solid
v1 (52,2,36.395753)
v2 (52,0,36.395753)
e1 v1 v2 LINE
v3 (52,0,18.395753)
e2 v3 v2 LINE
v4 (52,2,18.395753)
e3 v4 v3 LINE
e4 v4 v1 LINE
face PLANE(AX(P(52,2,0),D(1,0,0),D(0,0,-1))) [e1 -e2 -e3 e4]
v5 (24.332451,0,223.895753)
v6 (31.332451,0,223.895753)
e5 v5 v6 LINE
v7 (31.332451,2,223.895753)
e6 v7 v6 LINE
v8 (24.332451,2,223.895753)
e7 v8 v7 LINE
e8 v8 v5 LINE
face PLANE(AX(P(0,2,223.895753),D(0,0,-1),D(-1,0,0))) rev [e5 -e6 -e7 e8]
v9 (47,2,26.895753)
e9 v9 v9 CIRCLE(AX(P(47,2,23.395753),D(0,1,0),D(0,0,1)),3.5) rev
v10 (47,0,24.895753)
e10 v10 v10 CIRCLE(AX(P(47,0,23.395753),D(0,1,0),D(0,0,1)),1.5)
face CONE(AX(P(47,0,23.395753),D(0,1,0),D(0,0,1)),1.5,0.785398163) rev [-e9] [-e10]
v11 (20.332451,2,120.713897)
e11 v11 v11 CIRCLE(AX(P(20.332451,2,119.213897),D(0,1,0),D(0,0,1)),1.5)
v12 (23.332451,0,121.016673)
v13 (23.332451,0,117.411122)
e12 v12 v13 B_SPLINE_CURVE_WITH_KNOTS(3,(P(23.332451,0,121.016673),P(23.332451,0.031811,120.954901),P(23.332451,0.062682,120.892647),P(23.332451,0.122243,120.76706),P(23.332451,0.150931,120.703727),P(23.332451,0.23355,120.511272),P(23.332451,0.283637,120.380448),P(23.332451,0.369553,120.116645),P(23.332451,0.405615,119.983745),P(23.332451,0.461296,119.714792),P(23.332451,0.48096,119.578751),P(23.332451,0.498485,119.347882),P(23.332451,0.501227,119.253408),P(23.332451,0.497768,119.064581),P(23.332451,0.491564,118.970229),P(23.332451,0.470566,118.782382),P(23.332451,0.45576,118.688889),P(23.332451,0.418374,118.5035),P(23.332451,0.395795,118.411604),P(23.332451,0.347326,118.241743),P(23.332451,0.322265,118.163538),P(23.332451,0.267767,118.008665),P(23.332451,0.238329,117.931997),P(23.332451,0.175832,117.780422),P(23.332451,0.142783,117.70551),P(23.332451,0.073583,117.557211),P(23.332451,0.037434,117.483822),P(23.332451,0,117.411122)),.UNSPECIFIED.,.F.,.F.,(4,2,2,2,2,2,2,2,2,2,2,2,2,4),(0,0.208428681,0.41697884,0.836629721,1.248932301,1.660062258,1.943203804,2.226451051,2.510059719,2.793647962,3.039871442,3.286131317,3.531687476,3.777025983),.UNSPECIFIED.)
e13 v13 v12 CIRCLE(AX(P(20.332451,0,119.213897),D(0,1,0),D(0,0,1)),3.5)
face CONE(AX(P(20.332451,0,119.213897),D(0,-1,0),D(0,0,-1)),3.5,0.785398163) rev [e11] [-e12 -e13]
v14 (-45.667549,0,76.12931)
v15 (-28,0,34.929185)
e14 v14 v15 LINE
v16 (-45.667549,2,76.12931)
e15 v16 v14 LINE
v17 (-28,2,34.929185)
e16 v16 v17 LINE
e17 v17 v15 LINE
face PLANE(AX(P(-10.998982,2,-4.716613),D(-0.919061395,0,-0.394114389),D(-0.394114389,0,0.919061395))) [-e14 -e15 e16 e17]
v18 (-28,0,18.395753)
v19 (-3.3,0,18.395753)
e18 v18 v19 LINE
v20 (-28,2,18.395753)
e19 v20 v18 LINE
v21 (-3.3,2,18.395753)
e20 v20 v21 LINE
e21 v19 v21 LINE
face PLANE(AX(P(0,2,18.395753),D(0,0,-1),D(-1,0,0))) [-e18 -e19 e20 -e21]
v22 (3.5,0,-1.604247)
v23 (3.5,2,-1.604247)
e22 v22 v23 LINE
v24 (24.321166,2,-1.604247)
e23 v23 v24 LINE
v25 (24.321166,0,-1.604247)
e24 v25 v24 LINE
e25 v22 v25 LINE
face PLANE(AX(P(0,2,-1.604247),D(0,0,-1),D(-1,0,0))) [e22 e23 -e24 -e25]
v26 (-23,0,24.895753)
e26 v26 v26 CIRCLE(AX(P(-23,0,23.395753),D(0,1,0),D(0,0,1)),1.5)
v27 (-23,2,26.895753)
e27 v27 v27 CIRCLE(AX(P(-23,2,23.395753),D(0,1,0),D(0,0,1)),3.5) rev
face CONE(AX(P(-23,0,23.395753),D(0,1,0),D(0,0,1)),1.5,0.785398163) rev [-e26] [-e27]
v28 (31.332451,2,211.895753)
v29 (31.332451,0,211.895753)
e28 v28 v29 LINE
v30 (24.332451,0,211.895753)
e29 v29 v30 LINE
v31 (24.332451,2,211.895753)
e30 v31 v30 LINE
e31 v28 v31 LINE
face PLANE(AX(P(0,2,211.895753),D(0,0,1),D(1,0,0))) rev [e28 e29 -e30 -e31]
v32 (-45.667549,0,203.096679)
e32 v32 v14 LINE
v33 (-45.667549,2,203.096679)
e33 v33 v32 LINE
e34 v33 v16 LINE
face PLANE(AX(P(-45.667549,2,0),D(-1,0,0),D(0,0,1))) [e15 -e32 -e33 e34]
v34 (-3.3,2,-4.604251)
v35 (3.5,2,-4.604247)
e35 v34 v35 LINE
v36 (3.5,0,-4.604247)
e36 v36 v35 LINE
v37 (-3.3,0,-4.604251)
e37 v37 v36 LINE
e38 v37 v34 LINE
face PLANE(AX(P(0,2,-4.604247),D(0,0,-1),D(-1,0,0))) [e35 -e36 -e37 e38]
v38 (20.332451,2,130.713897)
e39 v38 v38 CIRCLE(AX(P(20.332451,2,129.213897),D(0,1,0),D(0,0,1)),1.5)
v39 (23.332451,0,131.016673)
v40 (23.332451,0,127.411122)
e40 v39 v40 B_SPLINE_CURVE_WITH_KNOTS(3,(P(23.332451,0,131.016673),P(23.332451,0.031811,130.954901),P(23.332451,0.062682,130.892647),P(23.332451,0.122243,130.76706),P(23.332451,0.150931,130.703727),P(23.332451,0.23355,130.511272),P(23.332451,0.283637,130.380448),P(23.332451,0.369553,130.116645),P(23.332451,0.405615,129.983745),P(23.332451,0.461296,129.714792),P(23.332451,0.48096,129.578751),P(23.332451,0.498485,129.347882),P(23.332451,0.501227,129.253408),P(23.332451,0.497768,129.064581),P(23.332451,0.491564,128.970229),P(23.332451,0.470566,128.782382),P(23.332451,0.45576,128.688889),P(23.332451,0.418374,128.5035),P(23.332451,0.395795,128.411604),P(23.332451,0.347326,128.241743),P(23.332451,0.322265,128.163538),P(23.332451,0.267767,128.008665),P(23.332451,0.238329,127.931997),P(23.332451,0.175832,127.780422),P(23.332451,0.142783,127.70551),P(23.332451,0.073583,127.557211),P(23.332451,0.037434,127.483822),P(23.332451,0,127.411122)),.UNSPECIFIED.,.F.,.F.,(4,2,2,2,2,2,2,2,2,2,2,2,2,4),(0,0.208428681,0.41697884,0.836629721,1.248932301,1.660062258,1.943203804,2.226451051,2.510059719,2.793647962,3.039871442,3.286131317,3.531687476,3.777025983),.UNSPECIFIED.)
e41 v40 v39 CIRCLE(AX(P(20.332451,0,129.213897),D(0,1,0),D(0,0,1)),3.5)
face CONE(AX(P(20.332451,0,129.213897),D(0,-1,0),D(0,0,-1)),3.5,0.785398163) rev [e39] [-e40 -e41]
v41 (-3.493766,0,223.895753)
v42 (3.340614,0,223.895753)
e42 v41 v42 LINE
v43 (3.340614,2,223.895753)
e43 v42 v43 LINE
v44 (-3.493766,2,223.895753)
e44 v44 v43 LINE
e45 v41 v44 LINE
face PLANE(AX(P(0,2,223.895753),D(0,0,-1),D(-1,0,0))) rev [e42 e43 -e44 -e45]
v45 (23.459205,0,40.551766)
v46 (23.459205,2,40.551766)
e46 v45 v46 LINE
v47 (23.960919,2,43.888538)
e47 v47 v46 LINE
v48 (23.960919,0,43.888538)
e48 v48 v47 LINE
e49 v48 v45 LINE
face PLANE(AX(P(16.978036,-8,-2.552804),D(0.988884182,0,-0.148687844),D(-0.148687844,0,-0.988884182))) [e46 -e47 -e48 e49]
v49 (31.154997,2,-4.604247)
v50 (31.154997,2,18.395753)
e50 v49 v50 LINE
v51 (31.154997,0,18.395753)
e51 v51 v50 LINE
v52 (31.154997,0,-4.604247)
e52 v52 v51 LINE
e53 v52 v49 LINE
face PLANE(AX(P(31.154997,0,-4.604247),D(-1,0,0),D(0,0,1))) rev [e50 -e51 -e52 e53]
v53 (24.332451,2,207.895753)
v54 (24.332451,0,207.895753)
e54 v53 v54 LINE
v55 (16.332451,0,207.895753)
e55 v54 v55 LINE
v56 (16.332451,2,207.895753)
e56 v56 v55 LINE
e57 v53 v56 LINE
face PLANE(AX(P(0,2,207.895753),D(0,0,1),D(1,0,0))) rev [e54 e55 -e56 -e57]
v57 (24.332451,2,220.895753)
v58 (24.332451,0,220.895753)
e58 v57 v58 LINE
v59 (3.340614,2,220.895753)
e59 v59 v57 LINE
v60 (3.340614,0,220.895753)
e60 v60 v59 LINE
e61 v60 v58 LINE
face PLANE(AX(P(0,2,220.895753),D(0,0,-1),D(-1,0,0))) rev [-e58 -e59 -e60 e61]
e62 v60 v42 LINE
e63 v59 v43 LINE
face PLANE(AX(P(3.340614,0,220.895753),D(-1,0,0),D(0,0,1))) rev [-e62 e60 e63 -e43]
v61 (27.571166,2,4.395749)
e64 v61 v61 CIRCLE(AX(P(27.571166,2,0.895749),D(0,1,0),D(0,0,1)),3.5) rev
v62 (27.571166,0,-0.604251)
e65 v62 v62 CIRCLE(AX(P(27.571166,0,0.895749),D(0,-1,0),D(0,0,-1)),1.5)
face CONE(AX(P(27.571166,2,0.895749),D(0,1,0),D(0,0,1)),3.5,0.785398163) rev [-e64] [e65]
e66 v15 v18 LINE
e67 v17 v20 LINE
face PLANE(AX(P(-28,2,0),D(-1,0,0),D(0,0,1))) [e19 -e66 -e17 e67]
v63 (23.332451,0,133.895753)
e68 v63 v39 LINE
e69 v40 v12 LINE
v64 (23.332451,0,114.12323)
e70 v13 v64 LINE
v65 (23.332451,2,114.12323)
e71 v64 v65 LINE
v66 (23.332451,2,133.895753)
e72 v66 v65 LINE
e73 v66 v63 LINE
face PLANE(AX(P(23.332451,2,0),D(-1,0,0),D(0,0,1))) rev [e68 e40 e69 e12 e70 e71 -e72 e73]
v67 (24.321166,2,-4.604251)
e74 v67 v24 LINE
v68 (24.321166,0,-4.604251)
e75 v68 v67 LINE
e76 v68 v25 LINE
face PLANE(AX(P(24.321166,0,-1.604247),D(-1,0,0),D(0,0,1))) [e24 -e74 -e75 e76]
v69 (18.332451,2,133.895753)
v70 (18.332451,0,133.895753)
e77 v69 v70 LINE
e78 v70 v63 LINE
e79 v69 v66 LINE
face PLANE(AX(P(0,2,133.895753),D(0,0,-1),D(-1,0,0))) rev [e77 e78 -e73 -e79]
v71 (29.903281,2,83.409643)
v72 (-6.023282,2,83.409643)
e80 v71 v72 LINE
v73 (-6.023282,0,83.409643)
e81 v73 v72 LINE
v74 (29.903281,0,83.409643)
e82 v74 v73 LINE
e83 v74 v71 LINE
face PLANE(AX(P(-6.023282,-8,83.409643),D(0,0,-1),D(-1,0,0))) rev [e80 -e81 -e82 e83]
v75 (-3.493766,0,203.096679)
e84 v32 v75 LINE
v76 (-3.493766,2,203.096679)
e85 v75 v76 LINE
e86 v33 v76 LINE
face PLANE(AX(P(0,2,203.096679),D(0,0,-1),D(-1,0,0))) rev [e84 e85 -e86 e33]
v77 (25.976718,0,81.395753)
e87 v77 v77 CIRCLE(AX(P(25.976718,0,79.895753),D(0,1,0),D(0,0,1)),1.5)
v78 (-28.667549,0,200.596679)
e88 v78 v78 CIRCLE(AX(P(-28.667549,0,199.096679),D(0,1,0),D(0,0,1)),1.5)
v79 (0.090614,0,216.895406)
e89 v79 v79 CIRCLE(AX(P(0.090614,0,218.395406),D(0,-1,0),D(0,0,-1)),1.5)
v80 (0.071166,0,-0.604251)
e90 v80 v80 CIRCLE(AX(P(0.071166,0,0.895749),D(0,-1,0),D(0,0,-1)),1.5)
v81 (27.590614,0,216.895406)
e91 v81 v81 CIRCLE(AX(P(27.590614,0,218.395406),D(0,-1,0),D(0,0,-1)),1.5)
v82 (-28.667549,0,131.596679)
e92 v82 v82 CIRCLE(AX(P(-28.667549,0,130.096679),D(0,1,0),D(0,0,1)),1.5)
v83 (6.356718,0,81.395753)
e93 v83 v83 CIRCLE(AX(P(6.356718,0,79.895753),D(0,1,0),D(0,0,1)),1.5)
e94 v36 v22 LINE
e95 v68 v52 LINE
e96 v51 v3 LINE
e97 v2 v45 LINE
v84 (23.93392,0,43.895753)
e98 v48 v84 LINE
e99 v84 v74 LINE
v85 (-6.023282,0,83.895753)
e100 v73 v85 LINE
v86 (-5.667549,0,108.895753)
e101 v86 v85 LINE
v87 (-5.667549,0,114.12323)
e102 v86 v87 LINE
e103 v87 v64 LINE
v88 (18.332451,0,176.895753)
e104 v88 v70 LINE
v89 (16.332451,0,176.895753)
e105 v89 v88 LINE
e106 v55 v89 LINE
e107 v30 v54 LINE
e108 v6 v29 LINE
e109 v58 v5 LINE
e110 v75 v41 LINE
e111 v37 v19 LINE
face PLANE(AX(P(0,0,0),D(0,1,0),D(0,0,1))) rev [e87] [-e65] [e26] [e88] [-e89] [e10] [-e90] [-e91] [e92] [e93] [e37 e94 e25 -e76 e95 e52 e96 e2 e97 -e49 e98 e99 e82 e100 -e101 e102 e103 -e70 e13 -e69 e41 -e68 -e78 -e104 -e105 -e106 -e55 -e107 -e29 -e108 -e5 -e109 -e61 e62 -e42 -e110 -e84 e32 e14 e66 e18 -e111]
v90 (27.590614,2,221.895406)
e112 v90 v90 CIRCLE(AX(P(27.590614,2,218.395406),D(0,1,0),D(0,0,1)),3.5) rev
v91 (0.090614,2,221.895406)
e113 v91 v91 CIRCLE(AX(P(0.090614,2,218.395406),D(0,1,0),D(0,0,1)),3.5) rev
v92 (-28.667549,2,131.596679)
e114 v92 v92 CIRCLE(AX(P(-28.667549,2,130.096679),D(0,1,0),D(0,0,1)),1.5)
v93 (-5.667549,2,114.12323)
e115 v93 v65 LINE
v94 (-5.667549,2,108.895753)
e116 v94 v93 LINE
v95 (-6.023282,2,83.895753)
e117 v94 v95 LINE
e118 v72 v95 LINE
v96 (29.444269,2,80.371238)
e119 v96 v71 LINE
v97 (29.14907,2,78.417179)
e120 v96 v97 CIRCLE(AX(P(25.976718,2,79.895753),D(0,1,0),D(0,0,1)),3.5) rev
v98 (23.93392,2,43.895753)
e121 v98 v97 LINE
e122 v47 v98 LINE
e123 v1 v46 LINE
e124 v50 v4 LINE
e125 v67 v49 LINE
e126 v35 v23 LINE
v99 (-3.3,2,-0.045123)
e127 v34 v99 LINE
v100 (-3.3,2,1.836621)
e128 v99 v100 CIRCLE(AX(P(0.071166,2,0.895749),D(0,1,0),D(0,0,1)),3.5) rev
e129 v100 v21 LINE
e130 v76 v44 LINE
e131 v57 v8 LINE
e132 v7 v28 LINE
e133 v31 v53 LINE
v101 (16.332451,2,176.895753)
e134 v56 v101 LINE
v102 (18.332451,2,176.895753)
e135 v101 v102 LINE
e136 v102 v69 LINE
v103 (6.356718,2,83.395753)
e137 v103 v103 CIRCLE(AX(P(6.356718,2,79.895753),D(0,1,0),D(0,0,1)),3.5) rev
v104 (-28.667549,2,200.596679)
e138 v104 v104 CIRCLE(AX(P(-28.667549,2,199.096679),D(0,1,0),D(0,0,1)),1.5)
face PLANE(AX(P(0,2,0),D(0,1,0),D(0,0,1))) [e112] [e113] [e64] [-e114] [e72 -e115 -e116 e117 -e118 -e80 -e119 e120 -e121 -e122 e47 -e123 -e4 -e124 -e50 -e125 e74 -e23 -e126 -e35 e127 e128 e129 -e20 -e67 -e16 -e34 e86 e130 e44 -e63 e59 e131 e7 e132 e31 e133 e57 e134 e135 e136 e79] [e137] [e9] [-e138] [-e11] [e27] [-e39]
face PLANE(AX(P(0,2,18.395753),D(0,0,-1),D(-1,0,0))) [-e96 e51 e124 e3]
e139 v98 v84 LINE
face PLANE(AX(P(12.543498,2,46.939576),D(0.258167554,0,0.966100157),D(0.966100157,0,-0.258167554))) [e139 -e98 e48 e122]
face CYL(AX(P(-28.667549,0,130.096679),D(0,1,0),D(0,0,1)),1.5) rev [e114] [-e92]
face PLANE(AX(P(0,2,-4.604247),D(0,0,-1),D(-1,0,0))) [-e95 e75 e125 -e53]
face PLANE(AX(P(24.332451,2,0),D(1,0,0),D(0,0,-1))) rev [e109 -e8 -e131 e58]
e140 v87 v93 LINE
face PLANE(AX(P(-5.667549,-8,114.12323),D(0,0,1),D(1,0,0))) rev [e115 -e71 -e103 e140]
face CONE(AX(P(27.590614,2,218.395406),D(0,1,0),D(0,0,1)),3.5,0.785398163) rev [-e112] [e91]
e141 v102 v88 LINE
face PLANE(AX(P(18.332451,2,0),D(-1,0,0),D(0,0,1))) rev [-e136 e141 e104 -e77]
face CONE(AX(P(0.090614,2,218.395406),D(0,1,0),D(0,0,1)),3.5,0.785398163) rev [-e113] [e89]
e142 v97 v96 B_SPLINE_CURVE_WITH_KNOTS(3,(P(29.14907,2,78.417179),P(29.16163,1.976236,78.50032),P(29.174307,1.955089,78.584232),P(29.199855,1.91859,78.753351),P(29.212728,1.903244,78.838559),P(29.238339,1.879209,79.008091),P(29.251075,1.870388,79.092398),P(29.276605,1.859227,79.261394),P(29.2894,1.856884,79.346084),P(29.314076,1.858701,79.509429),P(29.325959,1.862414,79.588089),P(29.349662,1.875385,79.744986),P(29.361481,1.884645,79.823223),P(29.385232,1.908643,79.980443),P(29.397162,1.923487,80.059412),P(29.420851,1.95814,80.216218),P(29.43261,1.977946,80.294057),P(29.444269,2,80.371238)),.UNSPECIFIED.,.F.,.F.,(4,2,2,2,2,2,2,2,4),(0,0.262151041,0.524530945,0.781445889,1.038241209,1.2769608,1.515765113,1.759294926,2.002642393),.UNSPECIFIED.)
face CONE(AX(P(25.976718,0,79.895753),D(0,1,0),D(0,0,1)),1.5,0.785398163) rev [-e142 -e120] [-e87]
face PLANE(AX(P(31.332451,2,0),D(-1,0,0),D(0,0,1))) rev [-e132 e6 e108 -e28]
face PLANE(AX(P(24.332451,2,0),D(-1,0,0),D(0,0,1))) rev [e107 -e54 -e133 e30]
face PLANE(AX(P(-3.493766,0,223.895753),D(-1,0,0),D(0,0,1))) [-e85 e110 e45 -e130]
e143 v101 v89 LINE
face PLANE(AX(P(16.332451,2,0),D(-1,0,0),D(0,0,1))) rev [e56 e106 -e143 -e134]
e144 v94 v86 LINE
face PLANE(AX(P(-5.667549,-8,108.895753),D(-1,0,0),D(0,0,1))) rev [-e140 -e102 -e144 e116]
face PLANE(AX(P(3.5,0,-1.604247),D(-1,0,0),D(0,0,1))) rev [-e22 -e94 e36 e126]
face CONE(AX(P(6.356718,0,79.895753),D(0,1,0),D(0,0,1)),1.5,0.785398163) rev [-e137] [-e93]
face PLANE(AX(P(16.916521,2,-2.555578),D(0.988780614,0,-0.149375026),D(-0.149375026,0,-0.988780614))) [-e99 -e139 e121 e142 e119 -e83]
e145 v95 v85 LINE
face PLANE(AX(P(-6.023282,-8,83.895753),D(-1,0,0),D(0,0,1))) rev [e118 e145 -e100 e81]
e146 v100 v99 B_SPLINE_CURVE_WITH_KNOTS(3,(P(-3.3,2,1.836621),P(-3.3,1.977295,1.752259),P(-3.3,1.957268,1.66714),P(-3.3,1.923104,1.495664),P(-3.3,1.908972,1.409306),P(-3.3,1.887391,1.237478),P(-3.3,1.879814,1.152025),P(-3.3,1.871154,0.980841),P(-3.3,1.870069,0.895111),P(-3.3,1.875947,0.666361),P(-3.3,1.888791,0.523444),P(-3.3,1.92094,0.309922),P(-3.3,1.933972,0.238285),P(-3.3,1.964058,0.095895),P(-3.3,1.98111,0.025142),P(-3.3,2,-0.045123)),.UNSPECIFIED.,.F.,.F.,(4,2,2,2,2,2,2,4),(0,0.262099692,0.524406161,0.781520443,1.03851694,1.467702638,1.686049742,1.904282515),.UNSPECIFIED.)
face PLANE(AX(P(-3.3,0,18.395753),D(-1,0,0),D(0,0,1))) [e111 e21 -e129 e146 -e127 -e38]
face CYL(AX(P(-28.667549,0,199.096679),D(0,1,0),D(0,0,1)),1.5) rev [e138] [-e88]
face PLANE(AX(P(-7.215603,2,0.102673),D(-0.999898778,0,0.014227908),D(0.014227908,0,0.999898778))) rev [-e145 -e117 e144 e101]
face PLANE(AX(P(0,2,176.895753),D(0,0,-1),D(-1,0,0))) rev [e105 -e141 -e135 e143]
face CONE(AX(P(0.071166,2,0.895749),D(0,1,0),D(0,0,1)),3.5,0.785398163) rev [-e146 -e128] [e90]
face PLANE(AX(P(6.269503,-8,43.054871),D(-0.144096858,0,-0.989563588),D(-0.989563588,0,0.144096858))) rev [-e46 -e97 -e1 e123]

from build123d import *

# Parameters (mm, degrees)
SKETCH1_R           = 1.5
BOSS_EXTRUDE1_DEPTH = 2
CHAMFER1_SIZE       = 2
SKETCH4_W           = 36.30312698
SKETCH4_H           = 0.486110151
CUT_EXTRUDE3_DEPTH  = 10
SKETCH5_W           = 29
SKETCH5_H           = 1.352839956
CUT_EXTRUDE4_DEPTH  = 10
SKETCH6_R           = 1.5
CUT_EXTRUDE5_DEPTH  = 2
SKETCH2_W           = 29
SKETCH2_H           = 5.227477133
CUT_EXTRUDE1_DEPTH  = 10
SKETCH7_R           = 1.5
CUT_EXTRUDE6_DEPTH  = 2
CHAMFER2_SIZE       = 2
CUT_EXTRUDE7_DEPTH  = 10
SKETCH9_W           = 2.845003066
SKETCH9_H           = 3
CUT_EXTRUDE8_DEPTH  = 2
SKETCH10_W          = 2.678834089
SKETCH10_H          = 3.000004318
BOSS_EXTRUDE2_DEPTH = 2
SKETCH11_W          = 3.5
SKETCH11_H          = 3
CUT_EXTRUDE9_DEPTH  = 2
SKETCH12_W          = 3.3
SKETCH12_H          = 23.000004318
BOSS_EXTRUDE3_DEPTH = 2
SKETCH13_W          = 2.845003066
SKETCH13_H          = 20
CUT_EXTRUDE10_DEPTH = 2
SKETCH14_R          = 1.5
CUT_EXTRUDE11_DEPTH = 2
CHAMFER3_SIZE       = 2
SKETCH15_W          = 0.991837727
SKETCH15_H          = 3
CUT_EXTRUDE12_DEPTH = 2
SKETCH16_W          = 0.826217407
SKETCH16_H          = 20.799074454
BOSS_EXTRUDE4_DEPTH = 2
SKETCH17_R          = 1.5
CUT_EXTRUDE13_DEPTH = 2
CHAMFER4_SIZE       = 2


# Some blends are built 0.0001 mm under size
with BuildPart() as part:
    # Sketch1 → Boss-Extrude1 (new body)
    with BuildSketch(Plane(origin=(0, 0, 0), x_dir=(1, 0, 0), z_dir=(0, 1, 0))):
        Polygon((0, 4.604246944), (7, 4.604246944), (7, 1.604246944), (27, 1.604246944), (27, 4.604246944), (34, 4.604246944), (34, -18.395753056), (52, -18.395753056), (52, -36.395753056), (23.933920219, -43.895753056), (29.976717731, -83.895753056), (-6.023282269, -83.895753056), (-5.667548556, -108.895753056), (23.332451444, -108.895753056), (23.332451444, -133.895753056), (18.332451444, -133.895753056), (18.332451444, -176.895753056), (16.332451444, -176.895753056), (16.332451444, -207.895753056), (24.332451444, -207.895753056), (24.332451444, -211.895753056), (31.332451444, -211.895753056), (31.332451444, -223.895753056), (24.332451444, -223.895753056), (24.332451444, -220.895753056), (4.332451444, -220.895753056), (4.332451444, -223.895753056), (-2.667548556, -223.895753056), (-2.667548556, -203.096678602), (-45.667548556, -203.096678602), (-45.667548556, -76.129309552), (-28, -34.929185263), (-28, -18.395753056), (0, -18.395753056), align=None)
        with Locations(Location((47, -23.395753056, 0), (0, 0, 270))):
            Circle(SKETCH1_R, mode=Mode.SUBTRACT)
        with Locations(Location((-23, -23.395753056, 0), (0, 0, 270))):
            Circle(SKETCH1_R, mode=Mode.SUBTRACT)
        with Locations(Location((25.976717731, -79.895753056, 0), (0, 0, 270))):
            Circle(SKETCH1_R, mode=Mode.SUBTRACT)
        with Locations(Location((6.356717731, -79.895753056, 0), (0, 0, 270))):
            Circle(SKETCH1_R, mode=Mode.SUBTRACT)
    extrude(amount=BOSS_EXTRUDE1_DEPTH)

    # Chamfer1
    # the kernel refuses this chamfer: 2 mm, written as the material it takes off along each edge
    with BuildSketch(Plane(origin=(6.356717731, 2, 79.895753056), x_dir=(0, 0, 1), z_dir=(-1, 0, 0))) as chamfer1_piece_1:
        Polygon((1.5, -CHAMFER1_SIZE), (1.5 + CHAMFER1_SIZE, 0), (1.5, 0), align=None)
    revolve(axis=Axis((6.356717731, 2, 79.895753056), (0, 1, 0)), mode=Mode.SUBTRACT)
    with BuildSketch(Plane(origin=(25.976717731, 2, 79.895753056), x_dir=(0, 0, 1), z_dir=(-1, 0, 0))) as chamfer1_piece_2:
        Polygon((1.5, -CHAMFER1_SIZE), (1.5 + CHAMFER1_SIZE, 0), (1.5, 0), align=None)
    revolve(axis=Axis((25.976717731, 2, 79.895753056), (0, 1, 0)), mode=Mode.SUBTRACT)
    with BuildSketch(Plane(origin=(-23, 2, 23.395753056), x_dir=(0, 0, 1), z_dir=(-1, 0, 0))) as chamfer1_piece_3:
        Polygon((1.5, -CHAMFER1_SIZE), (1.5 + CHAMFER1_SIZE, 0), (1.5, 0), align=None)
    revolve(axis=Axis((-23, 2, 23.395753056), (0, 1, 0)), mode=Mode.SUBTRACT)
    with BuildSketch(Plane(origin=(47, 2, 23.395753056), x_dir=(0, 0, 1), z_dir=(-1, 0, 0))) as chamfer1_piece_4:
        Polygon((1.5, -CHAMFER1_SIZE), (1.5 + CHAMFER1_SIZE, 0), (1.5, 0), align=None)
    revolve(axis=Axis((47, 2, 23.395753056), (0, 1, 0)), mode=Mode.SUBTRACT)

    # Sketch4 → Cut-Extrude3 (cut)
    with BuildSketch(Plane(origin=(0, 2, 0), x_dir=(1, 0, 0), z_dir=(0, 1, 0))):
        with Locations((12.128281221, -83.65269798)):
            Rectangle(SKETCH4_W, SKETCH4_H)
    extrude(amount=-CUT_EXTRUDE3_DEPTH, mode=Mode.SUBTRACT)

    # Sketch5 → Cut-Extrude4 (cut)
    with BuildSketch(Plane(origin=(0, 2, 0), x_dir=(1, 0, 0), z_dir=(0, 1, 0))):
        with Locations((8.832451444, -109.572173034)):
            Rectangle(SKETCH5_W, SKETCH5_H)
    extrude(amount=-CUT_EXTRUDE4_DEPTH, mode=Mode.SUBTRACT)

    # Sketch6 → Cut-Extrude5 (cut)
    with BuildSketch(Plane(origin=(0, 2, 0), x_dir=(1, 0, 0), z_dir=(0, 1, 0))):
        with Locations(Location((-28.667548556, -130.096678602, 0), (0, 0, 270))):
            Circle(SKETCH6_R)
        with Locations(Location((-28.667548556, -199.096678602, 0), (0, 0, 270))):
            Circle(SKETCH6_R)
    extrude(amount=-CUT_EXTRUDE5_DEPTH, mode=Mode.SUBTRACT)

    # Sketch2 → Cut-Extrude1 (cut)
    with BuildSketch(Plane(origin=(0, 2, 0), x_dir=(1, 0, 0), z_dir=(0, 1, 0))):
        with Locations((8.832451444, -111.509491623)):
            Rectangle(SKETCH2_W, SKETCH2_H)
    extrude(amount=-CUT_EXTRUDE1_DEPTH, mode=Mode.SUBTRACT)

    # Sketch7 → Cut-Extrude6 (cut)
    with BuildSketch(Plane(origin=(0, 2, 0), x_dir=(1, 0, 0), z_dir=(0, 1, 0))):
        with Locations(Location((20.332451444, -119.213897383, 0), (0, 0, 270))):
            Circle(SKETCH7_R)
        with Locations(Location((20.332451444, -129.213897383, 0), (0, 0, 270))):
            Circle(SKETCH7_R)
    extrude(amount=-CUT_EXTRUDE6_DEPTH, mode=Mode.SUBTRACT)

    # Chamfer2
    # the kernel refuses this chamfer: 2 mm, written as the material it takes off along each edge
    with BuildSketch(Plane(origin=(20.332451444, 0, 119.213897383), x_dir=(0, 0, 1), z_dir=(-1, 0, 0))) as chamfer2_piece_1:
        Polygon((1.5 + CHAMFER2_SIZE, 0), (1.5, CHAMFER2_SIZE), (1.5, 0), align=None)
    revolve(axis=Axis((20.332451444, 0, 119.213897383), (0, 1, 0)), mode=Mode.SUBTRACT)
    with BuildSketch(Plane(origin=(20.332451444, 0, 129.213897383), x_dir=(0, 0, 1), z_dir=(-1, 0, 0))) as chamfer2_piece_2:
        Polygon((1.5 + CHAMFER2_SIZE, 0), (1.5, CHAMFER2_SIZE), (1.5, 0), align=None)
    revolve(axis=Axis((20.332451444, 0, 129.213897383), (0, 1, 0)), mode=Mode.SUBTRACT)

    # Sketch8 → Cut-Extrude7 (cut)
    with BuildSketch(Plane(origin=(0, 2, 0), x_dir=(1, 0, 0), z_dir=(0, 1, 0))):
        Polygon((23.96091905, -43.888538253), (52, -36.395753056), (23.459204593, -40.551765872), align=None)
    extrude(amount=-CUT_EXTRUDE7_DEPTH, mode=Mode.SUBTRACT)

    # Sketch9 → Cut-Extrude8 (cut)
    with BuildSketch(Plane(origin=(0, 2, 0), x_dir=(1, 0, 0), z_dir=(0, 1, 0))):
        with Locations((32.577498467, 3.104246944)):
            Rectangle(SKETCH9_W, SKETCH9_H)
    extrude(amount=-CUT_EXTRUDE8_DEPTH, mode=Mode.SUBTRACT)

    # Sketch10 → Boss-Extrude2 (add)
    with BuildSketch(Plane(origin=(0, 2, 0), x_dir=(1, 0, 0), z_dir=(0, 1, 0))):
        with Locations((25.660582956, 3.104249103)):
            Rectangle(SKETCH10_W, SKETCH10_H)
    extrude(amount=-BOSS_EXTRUDE2_DEPTH)

    # Sketch11 → Cut-Extrude9 (cut)
    with BuildSketch(Plane(origin=(0, 2, 0), x_dir=(1, 0, 0), z_dir=(0, 1, 0))):
        with Locations((5.25, 3.104246944)):
            Rectangle(SKETCH11_W, SKETCH11_H)
    extrude(amount=-CUT_EXTRUDE9_DEPTH, mode=Mode.SUBTRACT)

    # Sketch12 → Boss-Extrude3 (add)
    with BuildSketch(Plane(origin=(0, 2, 0), x_dir=(1, 0, 0), z_dir=(0, 1, 0))):
        with Locations((-1.65, -6.895750897)):
            Rectangle(SKETCH12_W, SKETCH12_H)
    extrude(amount=-BOSS_EXTRUDE3_DEPTH)

    # Sketch13 → Cut-Extrude10 (cut)
    with BuildSketch(Plane(origin=(0, 2, 0), x_dir=(1, 0, 0), z_dir=(0, 1, 0))):
        with Locations((32.577498467, -8.395753056)):
            Rectangle(SKETCH13_W, SKETCH13_H)
    extrude(amount=-CUT_EXTRUDE10_DEPTH, mode=Mode.SUBTRACT)

    # Sketch14 → Cut-Extrude11 (cut)
    with BuildSketch(Plane.XZ):
        with Locations(Location((0.071165911, 0.895748738, 0), (0, 0, 270))):
            Circle(SKETCH14_R)
        with Locations(Location((27.571165911, 0.895748738, 0), (0, 0, 270))):
            Circle(SKETCH14_R)
    extrude(amount=-CUT_EXTRUDE11_DEPTH, mode=Mode.SUBTRACT)

    # Chamfer3
    # the kernel refuses this chamfer: 2 mm, written as the material it takes off along each edge
    with BuildSketch(Plane(origin=(0.071165911, 2, 0.895748738), x_dir=(0, 0, -1), z_dir=(-1, 0, 0))) as chamfer3_piece_1:
        Polygon((1.5 + CHAMFER3_SIZE, 0), (1.5, CHAMFER3_SIZE), (1.5, 0), align=None)
    revolve(axis=Axis((0.071165911, 2, 0.895748738), (0, -1, 0)), mode=Mode.SUBTRACT)
    with BuildSketch(Plane(origin=(27.571165911, 2, 0.895748738), x_dir=(0, 0, -1), z_dir=(-1, 0, 0))) as chamfer3_piece_2:
        Polygon((1.5 + CHAMFER3_SIZE, 0), (1.5, CHAMFER3_SIZE), (1.5, 0), align=None)
    revolve(axis=Axis((27.571165911, 2, 0.895748738), (0, -1, 0)), mode=Mode.SUBTRACT)

    # Sketch15 → Cut-Extrude12 (cut)
    with BuildSketch(Plane(origin=(0, 2, 0), x_dir=(1, 0, 0), z_dir=(0, 1, 0))):
        with Locations((3.836532581, -222.395753056)):
            Rectangle(SKETCH15_W, SKETCH15_H)
    extrude(amount=-CUT_EXTRUDE12_DEPTH, mode=Mode.SUBTRACT)

    # Sketch16 → Boss-Extrude4 (add)
    with BuildSketch(Plane(origin=(0, 2, 0), x_dir=(1, 0, 0), z_dir=(0, 1, 0))):
        with Locations((-3.08065726, -213.496215829)):
            Rectangle(SKETCH16_W, SKETCH16_H)
    extrude(amount=-BOSS_EXTRUDE4_DEPTH)

    # Sketch17 → Cut-Extrude13 (cut)
    with BuildSketch(Plane.XZ):
        with Locations(Location((27.590613723, 218.395405635, 0), (0, 0, 270))):
            Circle(SKETCH17_R)
        with Locations(Location((0.090613723, 218.395405628, 0), (0, 0, 270))):
            Circle(SKETCH17_R)
    extrude(amount=-CUT_EXTRUDE13_DEPTH, mode=Mode.SUBTRACT)

    # Chamfer4
    chamfer4_edges = [part.edges().sort_by_distance(p)[0] for p in [
        (27.590613723, 2, 219.895405635),
        (0.090613723, 2, 219.895405628),
    ]]
    chamfer(chamfer4_edges, length=CHAMFER4_SIZE - 0.0001)  # a hair under: the kernel refuses the full size


solid = part.part
